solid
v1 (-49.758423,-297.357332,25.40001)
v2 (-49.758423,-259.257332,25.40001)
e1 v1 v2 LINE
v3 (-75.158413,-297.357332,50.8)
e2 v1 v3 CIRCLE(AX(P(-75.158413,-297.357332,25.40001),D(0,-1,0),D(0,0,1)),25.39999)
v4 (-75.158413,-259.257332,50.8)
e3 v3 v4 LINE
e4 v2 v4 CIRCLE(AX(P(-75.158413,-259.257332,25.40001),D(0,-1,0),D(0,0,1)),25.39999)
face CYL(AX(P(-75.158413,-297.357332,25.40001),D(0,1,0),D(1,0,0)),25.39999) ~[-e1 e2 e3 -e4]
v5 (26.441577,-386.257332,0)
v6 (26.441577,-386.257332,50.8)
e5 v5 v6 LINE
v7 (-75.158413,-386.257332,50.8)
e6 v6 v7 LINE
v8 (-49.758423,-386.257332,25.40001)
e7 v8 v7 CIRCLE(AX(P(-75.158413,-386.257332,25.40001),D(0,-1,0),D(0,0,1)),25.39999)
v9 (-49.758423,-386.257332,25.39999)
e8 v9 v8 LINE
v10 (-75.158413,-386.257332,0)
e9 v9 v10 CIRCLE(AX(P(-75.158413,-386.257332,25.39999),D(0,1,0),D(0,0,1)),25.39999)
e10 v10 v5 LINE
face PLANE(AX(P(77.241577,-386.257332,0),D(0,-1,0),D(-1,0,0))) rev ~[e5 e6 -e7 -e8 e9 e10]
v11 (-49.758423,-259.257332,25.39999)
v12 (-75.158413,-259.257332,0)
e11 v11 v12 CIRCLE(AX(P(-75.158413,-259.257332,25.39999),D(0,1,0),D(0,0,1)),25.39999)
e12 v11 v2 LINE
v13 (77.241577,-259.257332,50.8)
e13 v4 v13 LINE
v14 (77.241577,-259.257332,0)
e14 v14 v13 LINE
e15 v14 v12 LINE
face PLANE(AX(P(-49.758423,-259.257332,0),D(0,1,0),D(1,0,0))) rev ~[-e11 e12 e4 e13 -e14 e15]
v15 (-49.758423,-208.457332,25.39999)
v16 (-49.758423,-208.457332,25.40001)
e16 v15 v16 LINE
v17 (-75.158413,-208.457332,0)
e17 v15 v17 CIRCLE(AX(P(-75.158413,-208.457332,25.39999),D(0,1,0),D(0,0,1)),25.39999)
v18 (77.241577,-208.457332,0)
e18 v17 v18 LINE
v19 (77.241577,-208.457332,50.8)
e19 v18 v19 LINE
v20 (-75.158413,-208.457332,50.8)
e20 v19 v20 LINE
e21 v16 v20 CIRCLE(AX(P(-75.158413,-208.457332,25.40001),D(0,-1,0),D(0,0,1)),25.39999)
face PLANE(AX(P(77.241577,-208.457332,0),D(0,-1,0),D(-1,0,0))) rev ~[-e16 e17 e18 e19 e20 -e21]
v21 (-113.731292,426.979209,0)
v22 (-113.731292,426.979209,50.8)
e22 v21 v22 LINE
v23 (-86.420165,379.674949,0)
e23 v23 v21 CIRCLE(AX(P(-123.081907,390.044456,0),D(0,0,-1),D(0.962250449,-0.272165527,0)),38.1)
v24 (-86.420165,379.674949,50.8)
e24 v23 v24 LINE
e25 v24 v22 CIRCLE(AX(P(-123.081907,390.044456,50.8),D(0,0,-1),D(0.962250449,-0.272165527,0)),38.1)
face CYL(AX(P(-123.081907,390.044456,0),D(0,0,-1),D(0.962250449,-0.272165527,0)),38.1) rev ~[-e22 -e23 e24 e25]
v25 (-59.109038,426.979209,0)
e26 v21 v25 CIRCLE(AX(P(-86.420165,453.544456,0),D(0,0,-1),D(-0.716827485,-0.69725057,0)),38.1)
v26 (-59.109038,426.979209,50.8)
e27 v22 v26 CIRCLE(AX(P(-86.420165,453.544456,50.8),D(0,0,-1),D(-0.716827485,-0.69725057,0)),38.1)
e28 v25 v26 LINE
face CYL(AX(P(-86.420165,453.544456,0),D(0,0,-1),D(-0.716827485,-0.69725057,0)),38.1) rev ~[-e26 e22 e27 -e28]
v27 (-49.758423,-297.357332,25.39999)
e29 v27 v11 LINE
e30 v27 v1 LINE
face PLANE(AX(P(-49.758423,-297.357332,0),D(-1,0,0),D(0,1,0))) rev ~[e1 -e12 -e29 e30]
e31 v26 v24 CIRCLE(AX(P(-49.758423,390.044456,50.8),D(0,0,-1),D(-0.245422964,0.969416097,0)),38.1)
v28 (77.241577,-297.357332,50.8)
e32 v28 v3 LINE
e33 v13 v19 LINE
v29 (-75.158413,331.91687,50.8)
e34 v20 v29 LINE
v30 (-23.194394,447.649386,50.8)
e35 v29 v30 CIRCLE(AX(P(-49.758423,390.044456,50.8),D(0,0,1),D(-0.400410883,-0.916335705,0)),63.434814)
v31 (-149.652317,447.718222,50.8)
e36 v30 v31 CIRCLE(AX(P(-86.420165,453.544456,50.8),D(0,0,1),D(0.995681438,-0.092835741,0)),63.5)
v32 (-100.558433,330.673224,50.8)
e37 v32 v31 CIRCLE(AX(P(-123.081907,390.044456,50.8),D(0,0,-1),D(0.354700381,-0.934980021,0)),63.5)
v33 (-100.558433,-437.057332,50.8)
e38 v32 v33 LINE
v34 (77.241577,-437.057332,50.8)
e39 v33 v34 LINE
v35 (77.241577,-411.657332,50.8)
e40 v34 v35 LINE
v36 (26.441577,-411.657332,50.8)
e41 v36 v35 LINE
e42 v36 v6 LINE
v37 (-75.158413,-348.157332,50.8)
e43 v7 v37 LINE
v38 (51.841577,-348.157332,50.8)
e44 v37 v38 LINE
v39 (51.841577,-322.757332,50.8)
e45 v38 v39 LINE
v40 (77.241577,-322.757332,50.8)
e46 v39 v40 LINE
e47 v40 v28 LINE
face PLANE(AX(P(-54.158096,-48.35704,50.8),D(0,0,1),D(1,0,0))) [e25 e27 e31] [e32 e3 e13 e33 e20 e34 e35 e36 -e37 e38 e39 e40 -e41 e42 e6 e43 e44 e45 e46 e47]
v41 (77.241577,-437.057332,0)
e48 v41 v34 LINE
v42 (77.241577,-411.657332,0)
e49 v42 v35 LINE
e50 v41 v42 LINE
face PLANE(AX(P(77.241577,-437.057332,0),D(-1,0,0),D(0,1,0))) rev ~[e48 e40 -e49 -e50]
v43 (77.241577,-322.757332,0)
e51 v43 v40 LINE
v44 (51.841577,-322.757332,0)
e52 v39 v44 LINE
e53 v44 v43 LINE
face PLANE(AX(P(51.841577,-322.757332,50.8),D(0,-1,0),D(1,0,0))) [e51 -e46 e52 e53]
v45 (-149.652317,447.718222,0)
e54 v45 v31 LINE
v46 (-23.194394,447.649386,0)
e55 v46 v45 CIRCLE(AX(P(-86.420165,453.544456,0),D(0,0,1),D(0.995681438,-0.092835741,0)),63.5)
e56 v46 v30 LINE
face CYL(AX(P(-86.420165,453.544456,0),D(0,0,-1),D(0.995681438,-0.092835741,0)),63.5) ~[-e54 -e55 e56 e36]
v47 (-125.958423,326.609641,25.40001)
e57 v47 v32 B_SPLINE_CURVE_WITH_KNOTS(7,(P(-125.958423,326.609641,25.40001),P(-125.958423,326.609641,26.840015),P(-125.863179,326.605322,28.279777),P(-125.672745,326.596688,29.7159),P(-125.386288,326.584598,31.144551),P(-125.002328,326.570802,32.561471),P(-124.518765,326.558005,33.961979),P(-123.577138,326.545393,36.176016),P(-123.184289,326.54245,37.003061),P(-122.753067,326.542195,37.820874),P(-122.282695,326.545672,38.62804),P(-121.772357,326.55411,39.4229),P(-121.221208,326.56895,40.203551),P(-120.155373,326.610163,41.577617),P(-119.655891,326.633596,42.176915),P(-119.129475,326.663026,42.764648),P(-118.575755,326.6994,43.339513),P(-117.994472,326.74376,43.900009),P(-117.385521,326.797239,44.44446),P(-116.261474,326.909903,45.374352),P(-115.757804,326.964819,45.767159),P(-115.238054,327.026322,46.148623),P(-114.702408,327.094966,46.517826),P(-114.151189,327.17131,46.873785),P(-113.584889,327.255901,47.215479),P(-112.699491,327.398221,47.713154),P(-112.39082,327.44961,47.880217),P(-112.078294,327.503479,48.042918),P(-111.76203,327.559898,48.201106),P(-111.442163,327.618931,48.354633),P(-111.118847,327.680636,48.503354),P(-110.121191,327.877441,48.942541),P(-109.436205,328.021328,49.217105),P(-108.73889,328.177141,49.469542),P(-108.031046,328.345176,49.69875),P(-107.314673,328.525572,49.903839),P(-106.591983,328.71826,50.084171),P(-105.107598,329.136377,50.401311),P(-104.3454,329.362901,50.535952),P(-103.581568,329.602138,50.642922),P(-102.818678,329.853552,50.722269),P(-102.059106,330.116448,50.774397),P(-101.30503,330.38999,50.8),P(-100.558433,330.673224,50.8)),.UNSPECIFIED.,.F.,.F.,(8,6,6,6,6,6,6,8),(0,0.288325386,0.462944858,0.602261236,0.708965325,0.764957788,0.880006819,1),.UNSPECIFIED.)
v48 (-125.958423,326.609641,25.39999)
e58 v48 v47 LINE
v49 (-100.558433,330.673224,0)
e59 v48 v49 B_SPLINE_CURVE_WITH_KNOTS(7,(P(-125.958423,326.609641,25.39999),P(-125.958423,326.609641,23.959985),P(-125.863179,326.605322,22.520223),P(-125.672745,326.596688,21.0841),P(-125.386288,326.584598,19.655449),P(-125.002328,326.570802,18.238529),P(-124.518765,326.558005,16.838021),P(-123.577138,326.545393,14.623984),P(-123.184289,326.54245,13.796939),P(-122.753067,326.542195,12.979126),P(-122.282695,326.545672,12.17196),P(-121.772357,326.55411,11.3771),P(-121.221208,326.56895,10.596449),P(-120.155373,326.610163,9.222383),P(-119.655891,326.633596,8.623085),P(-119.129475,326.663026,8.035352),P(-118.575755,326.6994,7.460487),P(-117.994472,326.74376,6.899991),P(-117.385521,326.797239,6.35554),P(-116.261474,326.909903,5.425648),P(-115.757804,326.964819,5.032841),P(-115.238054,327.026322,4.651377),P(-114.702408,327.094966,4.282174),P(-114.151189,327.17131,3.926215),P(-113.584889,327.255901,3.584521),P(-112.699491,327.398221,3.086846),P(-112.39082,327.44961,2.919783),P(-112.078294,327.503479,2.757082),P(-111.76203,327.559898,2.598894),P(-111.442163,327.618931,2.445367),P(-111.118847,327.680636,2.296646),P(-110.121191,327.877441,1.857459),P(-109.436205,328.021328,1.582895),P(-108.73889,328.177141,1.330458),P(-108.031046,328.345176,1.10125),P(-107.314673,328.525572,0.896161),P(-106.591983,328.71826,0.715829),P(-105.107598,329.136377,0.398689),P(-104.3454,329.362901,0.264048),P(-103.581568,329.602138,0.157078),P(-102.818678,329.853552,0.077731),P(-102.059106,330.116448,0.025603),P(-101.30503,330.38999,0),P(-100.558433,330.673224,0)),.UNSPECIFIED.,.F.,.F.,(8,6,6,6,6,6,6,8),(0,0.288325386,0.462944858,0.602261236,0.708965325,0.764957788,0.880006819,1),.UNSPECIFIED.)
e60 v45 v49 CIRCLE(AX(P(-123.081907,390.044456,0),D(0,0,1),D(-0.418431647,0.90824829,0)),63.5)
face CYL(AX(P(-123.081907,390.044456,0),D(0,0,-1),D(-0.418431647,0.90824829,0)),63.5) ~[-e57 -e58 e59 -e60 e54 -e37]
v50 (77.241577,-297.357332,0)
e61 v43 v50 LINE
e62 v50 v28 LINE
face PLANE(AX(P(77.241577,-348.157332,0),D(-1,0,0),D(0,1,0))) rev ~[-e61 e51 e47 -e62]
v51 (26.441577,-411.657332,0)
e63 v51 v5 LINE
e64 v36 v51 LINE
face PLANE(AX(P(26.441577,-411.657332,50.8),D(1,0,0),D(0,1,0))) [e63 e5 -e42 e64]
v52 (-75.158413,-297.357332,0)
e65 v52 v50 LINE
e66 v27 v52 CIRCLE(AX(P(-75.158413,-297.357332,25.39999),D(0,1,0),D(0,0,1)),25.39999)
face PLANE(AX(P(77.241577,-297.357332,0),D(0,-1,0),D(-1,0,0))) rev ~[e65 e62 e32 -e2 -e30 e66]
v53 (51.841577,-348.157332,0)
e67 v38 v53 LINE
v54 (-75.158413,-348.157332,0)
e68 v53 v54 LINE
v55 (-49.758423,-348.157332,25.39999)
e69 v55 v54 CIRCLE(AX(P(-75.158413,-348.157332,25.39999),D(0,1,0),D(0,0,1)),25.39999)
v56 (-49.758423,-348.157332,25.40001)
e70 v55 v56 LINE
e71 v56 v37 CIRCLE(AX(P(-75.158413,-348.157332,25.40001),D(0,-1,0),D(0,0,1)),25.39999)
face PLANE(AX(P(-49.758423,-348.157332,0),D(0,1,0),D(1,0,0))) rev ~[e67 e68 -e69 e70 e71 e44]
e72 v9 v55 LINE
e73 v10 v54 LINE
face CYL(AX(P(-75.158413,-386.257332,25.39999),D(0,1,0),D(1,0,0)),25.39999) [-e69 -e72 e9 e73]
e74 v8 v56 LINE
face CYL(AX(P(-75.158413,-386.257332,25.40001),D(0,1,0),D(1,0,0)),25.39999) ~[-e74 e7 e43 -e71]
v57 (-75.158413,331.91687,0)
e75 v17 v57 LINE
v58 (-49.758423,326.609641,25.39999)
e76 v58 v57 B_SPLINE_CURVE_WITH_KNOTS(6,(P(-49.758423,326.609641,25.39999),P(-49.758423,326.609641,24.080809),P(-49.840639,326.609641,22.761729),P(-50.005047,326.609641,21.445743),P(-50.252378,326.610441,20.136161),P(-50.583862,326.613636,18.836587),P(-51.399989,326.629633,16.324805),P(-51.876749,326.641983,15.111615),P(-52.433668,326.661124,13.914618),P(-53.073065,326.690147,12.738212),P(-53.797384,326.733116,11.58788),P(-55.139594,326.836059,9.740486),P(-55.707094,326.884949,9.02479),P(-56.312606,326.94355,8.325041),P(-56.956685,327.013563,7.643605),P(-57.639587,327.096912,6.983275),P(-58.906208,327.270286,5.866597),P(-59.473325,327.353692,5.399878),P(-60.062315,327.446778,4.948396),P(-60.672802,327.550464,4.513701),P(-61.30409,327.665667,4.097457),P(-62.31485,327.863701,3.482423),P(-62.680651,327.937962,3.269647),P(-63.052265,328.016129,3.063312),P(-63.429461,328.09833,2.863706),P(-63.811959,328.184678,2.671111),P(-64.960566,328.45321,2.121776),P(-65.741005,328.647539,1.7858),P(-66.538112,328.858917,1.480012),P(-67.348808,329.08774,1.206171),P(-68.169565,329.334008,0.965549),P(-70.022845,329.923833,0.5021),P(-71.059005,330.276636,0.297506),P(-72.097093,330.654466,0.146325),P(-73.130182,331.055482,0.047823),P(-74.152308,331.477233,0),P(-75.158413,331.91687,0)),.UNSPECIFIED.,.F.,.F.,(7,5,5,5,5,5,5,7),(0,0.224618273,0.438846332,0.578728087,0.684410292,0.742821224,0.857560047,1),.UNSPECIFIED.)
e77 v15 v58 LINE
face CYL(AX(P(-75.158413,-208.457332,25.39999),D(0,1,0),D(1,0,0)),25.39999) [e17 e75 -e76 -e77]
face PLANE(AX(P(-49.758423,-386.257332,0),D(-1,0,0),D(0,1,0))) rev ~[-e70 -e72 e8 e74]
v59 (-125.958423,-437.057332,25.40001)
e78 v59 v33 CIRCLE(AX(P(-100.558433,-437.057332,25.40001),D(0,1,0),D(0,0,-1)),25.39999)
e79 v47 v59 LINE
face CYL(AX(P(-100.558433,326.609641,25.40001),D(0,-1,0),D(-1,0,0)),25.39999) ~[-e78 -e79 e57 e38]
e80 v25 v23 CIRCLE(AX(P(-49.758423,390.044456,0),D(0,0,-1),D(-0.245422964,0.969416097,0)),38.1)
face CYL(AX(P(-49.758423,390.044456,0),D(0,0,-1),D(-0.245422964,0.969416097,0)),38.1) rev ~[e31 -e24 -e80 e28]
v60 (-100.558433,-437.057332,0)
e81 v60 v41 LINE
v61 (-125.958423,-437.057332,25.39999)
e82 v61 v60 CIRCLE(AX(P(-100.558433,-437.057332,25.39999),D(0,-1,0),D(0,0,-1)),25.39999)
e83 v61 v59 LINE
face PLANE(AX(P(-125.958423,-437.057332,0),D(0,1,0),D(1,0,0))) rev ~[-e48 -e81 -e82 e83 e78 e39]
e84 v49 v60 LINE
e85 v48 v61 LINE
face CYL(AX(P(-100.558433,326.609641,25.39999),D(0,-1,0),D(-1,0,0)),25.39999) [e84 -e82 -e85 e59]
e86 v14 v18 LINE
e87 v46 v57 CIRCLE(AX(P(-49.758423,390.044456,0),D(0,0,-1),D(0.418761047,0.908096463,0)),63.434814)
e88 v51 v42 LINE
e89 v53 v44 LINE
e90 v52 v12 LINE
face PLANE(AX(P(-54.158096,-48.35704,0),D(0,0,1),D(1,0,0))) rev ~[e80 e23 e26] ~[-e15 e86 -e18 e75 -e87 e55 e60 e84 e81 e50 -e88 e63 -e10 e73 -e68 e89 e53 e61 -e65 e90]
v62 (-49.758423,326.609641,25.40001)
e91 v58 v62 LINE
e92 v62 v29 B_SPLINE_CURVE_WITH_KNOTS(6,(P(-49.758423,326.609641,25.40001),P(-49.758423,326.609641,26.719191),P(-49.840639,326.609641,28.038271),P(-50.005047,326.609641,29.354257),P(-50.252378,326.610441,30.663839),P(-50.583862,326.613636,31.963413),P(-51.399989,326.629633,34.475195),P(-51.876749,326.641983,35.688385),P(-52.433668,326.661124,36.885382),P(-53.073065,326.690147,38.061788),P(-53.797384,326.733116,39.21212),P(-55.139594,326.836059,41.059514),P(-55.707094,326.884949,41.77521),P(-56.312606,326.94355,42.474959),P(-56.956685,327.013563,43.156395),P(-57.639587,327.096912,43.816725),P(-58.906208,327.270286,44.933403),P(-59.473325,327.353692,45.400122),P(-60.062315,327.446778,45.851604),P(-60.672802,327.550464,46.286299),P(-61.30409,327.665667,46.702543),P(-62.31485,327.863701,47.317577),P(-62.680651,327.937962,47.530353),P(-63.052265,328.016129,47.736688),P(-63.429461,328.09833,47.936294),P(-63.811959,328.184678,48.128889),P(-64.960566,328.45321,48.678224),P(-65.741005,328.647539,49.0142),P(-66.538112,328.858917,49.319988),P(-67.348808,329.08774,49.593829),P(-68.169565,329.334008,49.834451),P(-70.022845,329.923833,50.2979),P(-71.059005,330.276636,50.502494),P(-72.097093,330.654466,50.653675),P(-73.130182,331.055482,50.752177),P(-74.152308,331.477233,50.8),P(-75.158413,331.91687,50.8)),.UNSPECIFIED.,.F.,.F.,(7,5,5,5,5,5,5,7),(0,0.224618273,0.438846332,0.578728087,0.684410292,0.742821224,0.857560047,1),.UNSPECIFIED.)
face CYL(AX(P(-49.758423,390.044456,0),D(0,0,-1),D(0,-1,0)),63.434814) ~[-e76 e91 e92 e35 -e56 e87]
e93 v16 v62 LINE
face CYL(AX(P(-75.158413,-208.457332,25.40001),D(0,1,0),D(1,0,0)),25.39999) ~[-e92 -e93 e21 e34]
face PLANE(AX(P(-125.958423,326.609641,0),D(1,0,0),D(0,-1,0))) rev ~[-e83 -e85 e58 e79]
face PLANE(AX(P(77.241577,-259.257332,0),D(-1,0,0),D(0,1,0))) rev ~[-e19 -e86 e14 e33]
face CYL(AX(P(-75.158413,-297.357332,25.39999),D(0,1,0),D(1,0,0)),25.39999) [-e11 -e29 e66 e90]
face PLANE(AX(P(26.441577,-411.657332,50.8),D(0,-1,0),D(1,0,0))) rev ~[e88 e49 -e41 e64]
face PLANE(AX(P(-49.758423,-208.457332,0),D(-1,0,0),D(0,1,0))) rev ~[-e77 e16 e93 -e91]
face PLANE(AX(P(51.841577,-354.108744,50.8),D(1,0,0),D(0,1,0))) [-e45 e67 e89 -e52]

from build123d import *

# Parameters (mm, degrees)
F1_DEPTH = 50.8
F2_R     = 25.39999
F4_W     = 61.8233563619
F4_H     = 42.2021473569
F4_W_2   = 44.7444434271
F4_H_2   = 31.3514119965
F5_DEPTH = 50.8


# Not quite as in the source:
# - a fillet or chamfer is up to 0.001 mm smaller than in the source, because OpenCascade refuses the exact size


with BuildPart() as f1:
    # F0 (on Top) → F1 (new body)
    with BuildSketch(Plane.XY):
        with BuildLine():
            Line((-125.9584231198, 326.6096413136), (-125.9584231198, -437.0573322225))
            Line((-125.9584231198, -437.0573322225), (-49.7584231198, -437.0573322225))
            Line((-49.7584231198, -437.0573322225), (77.2415768802, -437.0573322225))
            Line((77.2415768802, -437.0573322225), (77.2415768802, -386.2573322225))
            Line((77.2415768802, -386.2573322225), (-49.7584231198, -386.2573322225))
            Line((-49.7584231198, -386.2573322225), (-49.7584231198, -348.1573322225))
            Line((-49.7584231198, -348.1573322225), (77.2415768802, -348.1573322225))
            Line((77.2415768802, -348.1573322225), (77.2415768802, -297.3573322225))
            Line((77.2415768802, -297.3573322225), (-49.7584231198, -297.3573322225))
            Line((-49.7584231198, -297.3573322225), (-49.7584231198, -259.2573322225))
            Line((-49.7584231198, -259.2573322225), (77.2415768802, -259.2573322225))
            Line((77.2415768802, -259.2573322225), (77.2415768802, -208.4573322225))
            Line((77.2415768802, -208.4573322225), (-49.7584231198, -208.4573322225))
            Line((-49.7584231198, -208.4573322225), (-49.7584231198, 326.6096413136))
            ThreePointArc((-49.7584231198, 326.6096413136), (12.201780711, 376.4463381022), (-23.1943939269, 447.6493859763))
            ThreePointArc((-23.1943939269, 447.6493859763), (-86.3855996742, 517.0444461389), (-149.6523168654, 447.718221991))
            ThreePointArc((-149.6523168654, 447.718221991), (-185.4004633868, 377.8523446501), (-125.9584231198, 326.6096413136))
        make_face()
        with BuildLine():
            ThreePointArc((-86.4201652133, 379.6749489688), (-156.0774751911, 370.9944555466), (-113.7312923812, 426.9792088355))
            ThreePointArc((-113.7312923812, 426.9792088355), (-86.4201652133, 491.6444555466), (-59.1090380455, 426.9792088355))
            ThreePointArc((-59.1090380455, 426.9792088355), (-16.7628552356, 370.9944555466), (-86.4201652133, 379.6749489688))
        make_face(mode=Mode.SUBTRACT)
    extrude(amount=F1_DEPTH)

    # F2 (radius 25.4 in the source; OpenCascade refuses exactly that, so slightly less here)
    f2_edges = [f1.edges().sort_by_distance(p)[0] for p in [
        (-125.958423, -55.223845, 50.8),
        (-49.758423, 59.076155, 50.8),
        (-49.758423, 59.076155, 0),
        (-125.958423, -55.223845, 0),
        (-49.758423, -278.307332, 0),
        (-49.758423, -367.207332, 0),
        (-49.758423, -367.207332, 50.8),
        (-49.758423, -278.307332, 50.8),
    ]]
    fillet(f2_edges, radius=F2_R)

    # F4 (on face) → F5 (cut)
    with BuildSketch(Plane.XY.offset(50.8)):
        with Locations((57.3532550612, -390.556258544)):
            Rectangle(F4_W, F4_H)
        with Locations((74.2137985938, -338.4330382207)):
            Rectangle(F4_W_2, F4_H_2)
    extrude(amount=-F5_DEPTH, mode=Mode.SUBTRACT)


solid = f1.part
